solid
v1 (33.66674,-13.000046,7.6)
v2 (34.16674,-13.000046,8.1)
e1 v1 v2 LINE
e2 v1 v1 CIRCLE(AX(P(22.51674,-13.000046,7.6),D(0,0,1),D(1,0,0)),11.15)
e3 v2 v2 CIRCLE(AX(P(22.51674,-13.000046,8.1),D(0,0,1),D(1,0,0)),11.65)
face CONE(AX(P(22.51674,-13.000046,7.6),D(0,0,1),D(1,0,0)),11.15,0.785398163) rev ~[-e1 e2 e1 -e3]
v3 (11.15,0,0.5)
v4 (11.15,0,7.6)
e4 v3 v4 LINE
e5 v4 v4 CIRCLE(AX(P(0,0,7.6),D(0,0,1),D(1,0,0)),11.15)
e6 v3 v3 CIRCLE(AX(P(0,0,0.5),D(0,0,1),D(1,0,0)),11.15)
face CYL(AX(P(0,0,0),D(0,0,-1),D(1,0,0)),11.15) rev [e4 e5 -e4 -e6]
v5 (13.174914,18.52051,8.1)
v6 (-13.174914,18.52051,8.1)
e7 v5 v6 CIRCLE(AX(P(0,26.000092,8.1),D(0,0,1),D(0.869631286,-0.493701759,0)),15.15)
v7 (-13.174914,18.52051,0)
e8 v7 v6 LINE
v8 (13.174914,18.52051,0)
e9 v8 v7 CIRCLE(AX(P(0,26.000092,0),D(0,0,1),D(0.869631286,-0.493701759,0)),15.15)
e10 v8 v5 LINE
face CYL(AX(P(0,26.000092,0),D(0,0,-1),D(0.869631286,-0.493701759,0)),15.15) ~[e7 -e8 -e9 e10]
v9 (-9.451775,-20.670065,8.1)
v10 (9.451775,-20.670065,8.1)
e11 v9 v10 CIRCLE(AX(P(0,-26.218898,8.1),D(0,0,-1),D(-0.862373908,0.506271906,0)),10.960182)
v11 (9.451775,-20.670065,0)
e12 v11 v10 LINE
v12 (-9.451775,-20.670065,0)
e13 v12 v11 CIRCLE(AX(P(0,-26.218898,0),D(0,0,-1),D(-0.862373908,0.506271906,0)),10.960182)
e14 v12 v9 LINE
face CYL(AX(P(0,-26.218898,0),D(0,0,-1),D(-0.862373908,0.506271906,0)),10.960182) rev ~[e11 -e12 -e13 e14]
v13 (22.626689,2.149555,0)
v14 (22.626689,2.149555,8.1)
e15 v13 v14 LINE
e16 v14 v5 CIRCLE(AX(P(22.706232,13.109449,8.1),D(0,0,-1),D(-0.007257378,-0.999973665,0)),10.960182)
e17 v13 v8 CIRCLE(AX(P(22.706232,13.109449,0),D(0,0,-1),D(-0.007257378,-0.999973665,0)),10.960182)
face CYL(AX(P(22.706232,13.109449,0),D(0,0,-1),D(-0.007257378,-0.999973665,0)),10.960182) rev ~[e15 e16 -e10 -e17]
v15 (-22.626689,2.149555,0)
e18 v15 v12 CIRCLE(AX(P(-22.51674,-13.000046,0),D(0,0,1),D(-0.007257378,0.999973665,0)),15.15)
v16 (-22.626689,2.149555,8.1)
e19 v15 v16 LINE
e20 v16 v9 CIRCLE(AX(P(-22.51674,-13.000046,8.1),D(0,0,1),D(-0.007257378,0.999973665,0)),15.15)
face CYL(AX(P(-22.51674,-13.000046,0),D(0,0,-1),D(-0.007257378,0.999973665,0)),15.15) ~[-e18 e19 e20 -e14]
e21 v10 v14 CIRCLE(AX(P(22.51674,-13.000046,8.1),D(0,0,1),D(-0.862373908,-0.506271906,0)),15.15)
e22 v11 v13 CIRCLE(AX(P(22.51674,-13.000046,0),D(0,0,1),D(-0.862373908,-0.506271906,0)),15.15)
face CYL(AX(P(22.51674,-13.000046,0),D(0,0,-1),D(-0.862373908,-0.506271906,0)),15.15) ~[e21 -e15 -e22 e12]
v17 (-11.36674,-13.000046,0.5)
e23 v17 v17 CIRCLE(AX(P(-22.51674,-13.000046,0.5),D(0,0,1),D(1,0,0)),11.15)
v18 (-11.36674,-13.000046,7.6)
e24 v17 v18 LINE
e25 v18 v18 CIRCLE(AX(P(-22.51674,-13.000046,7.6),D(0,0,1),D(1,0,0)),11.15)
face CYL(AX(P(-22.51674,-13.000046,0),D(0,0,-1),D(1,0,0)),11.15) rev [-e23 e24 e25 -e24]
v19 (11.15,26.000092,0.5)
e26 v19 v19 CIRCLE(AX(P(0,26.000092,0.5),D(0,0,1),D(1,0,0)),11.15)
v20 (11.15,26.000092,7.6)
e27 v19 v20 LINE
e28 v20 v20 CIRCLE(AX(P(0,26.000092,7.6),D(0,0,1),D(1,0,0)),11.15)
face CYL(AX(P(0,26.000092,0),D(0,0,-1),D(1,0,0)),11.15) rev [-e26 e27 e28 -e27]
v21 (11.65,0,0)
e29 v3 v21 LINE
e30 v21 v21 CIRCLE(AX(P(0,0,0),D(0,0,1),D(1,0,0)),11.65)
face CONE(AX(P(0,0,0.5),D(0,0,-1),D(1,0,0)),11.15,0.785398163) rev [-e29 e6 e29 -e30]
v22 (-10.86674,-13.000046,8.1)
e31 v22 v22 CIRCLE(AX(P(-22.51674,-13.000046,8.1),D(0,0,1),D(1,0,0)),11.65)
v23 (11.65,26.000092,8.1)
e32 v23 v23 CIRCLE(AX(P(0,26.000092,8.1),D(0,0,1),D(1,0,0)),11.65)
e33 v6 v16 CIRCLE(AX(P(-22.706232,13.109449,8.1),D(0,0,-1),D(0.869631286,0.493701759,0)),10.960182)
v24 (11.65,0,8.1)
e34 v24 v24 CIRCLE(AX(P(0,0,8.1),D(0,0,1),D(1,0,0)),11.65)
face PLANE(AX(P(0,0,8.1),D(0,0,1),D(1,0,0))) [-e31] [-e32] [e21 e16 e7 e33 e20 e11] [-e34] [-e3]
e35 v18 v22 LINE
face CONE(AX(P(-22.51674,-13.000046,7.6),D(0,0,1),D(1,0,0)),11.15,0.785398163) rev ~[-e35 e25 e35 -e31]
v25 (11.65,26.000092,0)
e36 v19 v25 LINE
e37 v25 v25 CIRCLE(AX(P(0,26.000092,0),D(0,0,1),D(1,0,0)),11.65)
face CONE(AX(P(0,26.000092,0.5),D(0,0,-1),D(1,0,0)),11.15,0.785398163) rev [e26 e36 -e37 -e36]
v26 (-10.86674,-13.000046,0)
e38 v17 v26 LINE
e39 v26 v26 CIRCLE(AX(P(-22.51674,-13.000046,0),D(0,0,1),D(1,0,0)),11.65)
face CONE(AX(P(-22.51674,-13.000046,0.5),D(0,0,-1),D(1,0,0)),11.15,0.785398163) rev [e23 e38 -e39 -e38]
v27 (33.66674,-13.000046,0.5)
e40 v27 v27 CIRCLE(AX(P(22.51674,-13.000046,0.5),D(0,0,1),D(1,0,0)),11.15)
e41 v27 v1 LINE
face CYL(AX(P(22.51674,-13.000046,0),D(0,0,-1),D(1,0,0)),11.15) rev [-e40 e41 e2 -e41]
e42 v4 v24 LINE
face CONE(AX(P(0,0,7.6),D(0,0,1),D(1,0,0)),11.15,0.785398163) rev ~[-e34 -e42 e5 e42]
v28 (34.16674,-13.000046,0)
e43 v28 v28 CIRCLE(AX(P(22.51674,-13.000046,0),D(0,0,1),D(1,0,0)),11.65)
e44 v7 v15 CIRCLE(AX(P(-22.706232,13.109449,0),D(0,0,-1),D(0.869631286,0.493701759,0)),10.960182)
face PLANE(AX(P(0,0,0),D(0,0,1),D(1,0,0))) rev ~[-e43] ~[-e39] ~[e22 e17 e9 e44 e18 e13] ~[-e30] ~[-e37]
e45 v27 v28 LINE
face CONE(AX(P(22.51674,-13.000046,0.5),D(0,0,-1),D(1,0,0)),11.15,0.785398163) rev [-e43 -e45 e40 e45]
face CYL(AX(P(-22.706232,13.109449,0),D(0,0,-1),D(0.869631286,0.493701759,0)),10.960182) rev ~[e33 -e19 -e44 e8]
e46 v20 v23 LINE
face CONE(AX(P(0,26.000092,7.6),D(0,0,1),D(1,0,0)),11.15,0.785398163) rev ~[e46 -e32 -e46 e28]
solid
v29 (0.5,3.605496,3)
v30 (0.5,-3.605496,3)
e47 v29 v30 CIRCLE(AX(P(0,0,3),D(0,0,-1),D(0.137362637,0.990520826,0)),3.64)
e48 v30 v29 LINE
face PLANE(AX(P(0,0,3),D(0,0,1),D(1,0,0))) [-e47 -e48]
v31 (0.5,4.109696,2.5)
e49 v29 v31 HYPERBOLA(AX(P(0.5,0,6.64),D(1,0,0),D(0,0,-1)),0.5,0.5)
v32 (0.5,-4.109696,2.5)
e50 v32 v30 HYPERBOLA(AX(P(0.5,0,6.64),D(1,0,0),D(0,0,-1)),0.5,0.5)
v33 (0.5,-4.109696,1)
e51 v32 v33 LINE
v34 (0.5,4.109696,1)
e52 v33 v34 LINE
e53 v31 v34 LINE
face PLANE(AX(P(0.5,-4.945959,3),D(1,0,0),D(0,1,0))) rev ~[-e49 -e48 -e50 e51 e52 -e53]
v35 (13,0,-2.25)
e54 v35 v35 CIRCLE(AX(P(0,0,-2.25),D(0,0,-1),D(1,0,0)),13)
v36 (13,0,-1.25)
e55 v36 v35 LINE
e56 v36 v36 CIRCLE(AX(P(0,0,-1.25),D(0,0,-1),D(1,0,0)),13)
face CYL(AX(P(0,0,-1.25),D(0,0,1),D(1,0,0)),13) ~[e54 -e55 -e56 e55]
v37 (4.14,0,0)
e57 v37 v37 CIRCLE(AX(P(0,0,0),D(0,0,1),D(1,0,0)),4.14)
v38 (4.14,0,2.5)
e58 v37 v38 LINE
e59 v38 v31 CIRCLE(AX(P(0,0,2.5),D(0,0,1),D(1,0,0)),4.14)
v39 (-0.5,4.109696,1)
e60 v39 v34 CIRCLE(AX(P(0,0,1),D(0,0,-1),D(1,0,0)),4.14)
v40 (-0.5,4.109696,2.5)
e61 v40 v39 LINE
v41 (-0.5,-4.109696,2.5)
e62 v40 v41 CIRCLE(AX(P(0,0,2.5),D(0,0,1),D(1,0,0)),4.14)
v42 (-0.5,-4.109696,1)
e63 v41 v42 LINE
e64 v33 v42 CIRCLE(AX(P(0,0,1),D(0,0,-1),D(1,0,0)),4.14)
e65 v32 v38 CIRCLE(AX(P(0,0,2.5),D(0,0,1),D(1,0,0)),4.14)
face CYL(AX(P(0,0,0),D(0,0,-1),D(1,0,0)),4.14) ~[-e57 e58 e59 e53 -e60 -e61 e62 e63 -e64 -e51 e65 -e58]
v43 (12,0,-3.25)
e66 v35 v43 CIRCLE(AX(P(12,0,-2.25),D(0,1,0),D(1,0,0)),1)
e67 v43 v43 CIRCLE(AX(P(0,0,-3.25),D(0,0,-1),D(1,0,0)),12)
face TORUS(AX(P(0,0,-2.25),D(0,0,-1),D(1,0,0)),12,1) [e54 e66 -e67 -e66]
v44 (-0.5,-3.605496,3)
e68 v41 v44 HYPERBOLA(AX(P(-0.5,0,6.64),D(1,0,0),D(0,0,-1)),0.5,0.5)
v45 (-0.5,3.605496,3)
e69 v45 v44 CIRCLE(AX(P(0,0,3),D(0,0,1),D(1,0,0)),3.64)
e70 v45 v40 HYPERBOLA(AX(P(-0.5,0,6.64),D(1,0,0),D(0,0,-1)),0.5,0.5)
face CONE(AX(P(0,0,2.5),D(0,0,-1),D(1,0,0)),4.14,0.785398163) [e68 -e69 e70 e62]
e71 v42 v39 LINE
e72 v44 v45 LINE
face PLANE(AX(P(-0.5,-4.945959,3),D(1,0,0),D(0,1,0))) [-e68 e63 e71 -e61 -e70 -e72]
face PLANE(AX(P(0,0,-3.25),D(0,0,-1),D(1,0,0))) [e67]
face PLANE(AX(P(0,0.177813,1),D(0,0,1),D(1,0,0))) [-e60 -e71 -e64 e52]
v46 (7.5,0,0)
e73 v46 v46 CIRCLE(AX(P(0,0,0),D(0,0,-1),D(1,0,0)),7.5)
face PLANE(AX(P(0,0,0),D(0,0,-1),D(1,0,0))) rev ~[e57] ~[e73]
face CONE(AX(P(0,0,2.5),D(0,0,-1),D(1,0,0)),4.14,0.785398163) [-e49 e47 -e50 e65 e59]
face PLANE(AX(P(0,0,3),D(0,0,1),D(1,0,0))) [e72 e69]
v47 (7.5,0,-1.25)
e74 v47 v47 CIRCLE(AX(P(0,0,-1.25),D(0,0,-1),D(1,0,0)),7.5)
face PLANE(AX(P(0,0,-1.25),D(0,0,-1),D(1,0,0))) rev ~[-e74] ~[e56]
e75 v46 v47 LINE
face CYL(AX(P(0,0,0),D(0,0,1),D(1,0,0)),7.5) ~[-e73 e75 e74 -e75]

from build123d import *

# Parameters (mm, degrees)
F0_R      = 11.15
F1_DEPTH  = 8.1
F2_SIZE   = 0.5
F3_R      = 4.14
F4_DEPTH  = 3
F5_R      = 7.5
F6_DEPTH  = 1.25
F7_R      = 13
F8_DEPTH  = 2
F9_R      = 1
F10_SIZE  = 0.5
F11_W     = 1
F11_H     = 10.2475439198
F12_DEPTH = 2


# Not quite as in the source:
# - a feature names something its author has since deleted; it is built from what else it names


with BuildPart() as f1:
    # F0 (on Top) → F1 (new body)
    with BuildSketch(Plane.XY):
        with BuildLine():
            ThreePointArc((22.6266893771, 2.1495550685), (13.2144351026, 7.6293576707), (13.1749139786, 18.5205102804))
            ThreePointArc((13.1749139786, 18.5205102804), (0, 41.1500919302), (-13.1749139786, 18.5205102804))
            ThreePointArc((-13.1749139786, 18.5205102804), (-13.2144351026, 7.6293576707), (-22.6266893771, 2.1495550685))
            ThreePointArc((-22.6266893771, 2.1495550685), (-35.6370249735, -20.5750459546), (-9.4517753985, -20.6700653278))
            ThreePointArc((-9.4517753985, -20.6700653278), (0, -15.2587153203), (9.4517753985, -20.6700653278))
            ThreePointArc((9.4517753985, -20.6700653278), (35.6370249736, -20.5750459545), (22.6266893771, 2.1495550685))
        make_face()
        with Locations((-22.5167401062, -13.0000459546)):
            Circle(F0_R, mode=Mode.SUBTRACT)
        Circle(F0_R, mode=Mode.SUBTRACT)
        with Locations((22.5167401062, -13.0000459546)):
            Circle(F0_R, mode=Mode.SUBTRACT)
        with Locations((0, 26.0000919302)):
            Circle(F0_R, mode=Mode.SUBTRACT)
    extrude(amount=F1_DEPTH)

    # F2
    f2_edges = [f1.edges().sort_by_distance(p)[0] for p in [
        (-11.15, 0, 8.1),
        (-11.15, 26.000092, 8.1),
        (-11.15, 26.000092, 0),
        (-11.15, 0, 0),
        (11.36674, -13.000046, 8.1),
        (-33.66674, -13.000046, 8.1),
        (-33.66674, -13.000046, 0),
        (11.36674, -13.000046, 0),
    ]]
    chamfer(f2_edges, length=F2_SIZE)


with BuildPart() as f4:
    # F3 (on Top) → F4 (new body)
    with BuildSketch(Plane.XY):
        Circle(F3_R)
    extrude(amount=F4_DEPTH)

    # F5 (on face) → F6 (join)
    with BuildSketch(Plane(origin=(0, 0, 0), x_dir=(1, 0, 0), z_dir=(0, 0, -1))):
        Circle(F5_R)
    extrude(amount=F6_DEPTH)

    # F7 (on face) → F8 (join)
    with BuildSketch(Plane(origin=(0, 0, -1.25), x_dir=(1, 0, 0), z_dir=(0, 0, -1))):
        Circle(F7_R)
    extrude(amount=F8_DEPTH)

    # F9
    f9_edges = [f4.edges().sort_by_distance(p)[0] for p in [
        (-13, 0, -3.25),
    ]]
    fillet(f9_edges, radius=F9_R)

    # F10
    f10_edges = [f4.edges().sort_by_distance(p)[0] for p in [
        (-4.14, 0, 3),
    ]]
    chamfer(f10_edges, length=F10_SIZE)

    # F11 (on face) → F12 (cut)
    with BuildSketch(Plane.XY.offset(3)):
        with Locations((0, 0.1778125297)):
            Rectangle(F11_W, F11_H)
    extrude(amount=-F12_DEPTH, mode=Mode.SUBTRACT)


solid = Compound([f1.part, f4.part])
